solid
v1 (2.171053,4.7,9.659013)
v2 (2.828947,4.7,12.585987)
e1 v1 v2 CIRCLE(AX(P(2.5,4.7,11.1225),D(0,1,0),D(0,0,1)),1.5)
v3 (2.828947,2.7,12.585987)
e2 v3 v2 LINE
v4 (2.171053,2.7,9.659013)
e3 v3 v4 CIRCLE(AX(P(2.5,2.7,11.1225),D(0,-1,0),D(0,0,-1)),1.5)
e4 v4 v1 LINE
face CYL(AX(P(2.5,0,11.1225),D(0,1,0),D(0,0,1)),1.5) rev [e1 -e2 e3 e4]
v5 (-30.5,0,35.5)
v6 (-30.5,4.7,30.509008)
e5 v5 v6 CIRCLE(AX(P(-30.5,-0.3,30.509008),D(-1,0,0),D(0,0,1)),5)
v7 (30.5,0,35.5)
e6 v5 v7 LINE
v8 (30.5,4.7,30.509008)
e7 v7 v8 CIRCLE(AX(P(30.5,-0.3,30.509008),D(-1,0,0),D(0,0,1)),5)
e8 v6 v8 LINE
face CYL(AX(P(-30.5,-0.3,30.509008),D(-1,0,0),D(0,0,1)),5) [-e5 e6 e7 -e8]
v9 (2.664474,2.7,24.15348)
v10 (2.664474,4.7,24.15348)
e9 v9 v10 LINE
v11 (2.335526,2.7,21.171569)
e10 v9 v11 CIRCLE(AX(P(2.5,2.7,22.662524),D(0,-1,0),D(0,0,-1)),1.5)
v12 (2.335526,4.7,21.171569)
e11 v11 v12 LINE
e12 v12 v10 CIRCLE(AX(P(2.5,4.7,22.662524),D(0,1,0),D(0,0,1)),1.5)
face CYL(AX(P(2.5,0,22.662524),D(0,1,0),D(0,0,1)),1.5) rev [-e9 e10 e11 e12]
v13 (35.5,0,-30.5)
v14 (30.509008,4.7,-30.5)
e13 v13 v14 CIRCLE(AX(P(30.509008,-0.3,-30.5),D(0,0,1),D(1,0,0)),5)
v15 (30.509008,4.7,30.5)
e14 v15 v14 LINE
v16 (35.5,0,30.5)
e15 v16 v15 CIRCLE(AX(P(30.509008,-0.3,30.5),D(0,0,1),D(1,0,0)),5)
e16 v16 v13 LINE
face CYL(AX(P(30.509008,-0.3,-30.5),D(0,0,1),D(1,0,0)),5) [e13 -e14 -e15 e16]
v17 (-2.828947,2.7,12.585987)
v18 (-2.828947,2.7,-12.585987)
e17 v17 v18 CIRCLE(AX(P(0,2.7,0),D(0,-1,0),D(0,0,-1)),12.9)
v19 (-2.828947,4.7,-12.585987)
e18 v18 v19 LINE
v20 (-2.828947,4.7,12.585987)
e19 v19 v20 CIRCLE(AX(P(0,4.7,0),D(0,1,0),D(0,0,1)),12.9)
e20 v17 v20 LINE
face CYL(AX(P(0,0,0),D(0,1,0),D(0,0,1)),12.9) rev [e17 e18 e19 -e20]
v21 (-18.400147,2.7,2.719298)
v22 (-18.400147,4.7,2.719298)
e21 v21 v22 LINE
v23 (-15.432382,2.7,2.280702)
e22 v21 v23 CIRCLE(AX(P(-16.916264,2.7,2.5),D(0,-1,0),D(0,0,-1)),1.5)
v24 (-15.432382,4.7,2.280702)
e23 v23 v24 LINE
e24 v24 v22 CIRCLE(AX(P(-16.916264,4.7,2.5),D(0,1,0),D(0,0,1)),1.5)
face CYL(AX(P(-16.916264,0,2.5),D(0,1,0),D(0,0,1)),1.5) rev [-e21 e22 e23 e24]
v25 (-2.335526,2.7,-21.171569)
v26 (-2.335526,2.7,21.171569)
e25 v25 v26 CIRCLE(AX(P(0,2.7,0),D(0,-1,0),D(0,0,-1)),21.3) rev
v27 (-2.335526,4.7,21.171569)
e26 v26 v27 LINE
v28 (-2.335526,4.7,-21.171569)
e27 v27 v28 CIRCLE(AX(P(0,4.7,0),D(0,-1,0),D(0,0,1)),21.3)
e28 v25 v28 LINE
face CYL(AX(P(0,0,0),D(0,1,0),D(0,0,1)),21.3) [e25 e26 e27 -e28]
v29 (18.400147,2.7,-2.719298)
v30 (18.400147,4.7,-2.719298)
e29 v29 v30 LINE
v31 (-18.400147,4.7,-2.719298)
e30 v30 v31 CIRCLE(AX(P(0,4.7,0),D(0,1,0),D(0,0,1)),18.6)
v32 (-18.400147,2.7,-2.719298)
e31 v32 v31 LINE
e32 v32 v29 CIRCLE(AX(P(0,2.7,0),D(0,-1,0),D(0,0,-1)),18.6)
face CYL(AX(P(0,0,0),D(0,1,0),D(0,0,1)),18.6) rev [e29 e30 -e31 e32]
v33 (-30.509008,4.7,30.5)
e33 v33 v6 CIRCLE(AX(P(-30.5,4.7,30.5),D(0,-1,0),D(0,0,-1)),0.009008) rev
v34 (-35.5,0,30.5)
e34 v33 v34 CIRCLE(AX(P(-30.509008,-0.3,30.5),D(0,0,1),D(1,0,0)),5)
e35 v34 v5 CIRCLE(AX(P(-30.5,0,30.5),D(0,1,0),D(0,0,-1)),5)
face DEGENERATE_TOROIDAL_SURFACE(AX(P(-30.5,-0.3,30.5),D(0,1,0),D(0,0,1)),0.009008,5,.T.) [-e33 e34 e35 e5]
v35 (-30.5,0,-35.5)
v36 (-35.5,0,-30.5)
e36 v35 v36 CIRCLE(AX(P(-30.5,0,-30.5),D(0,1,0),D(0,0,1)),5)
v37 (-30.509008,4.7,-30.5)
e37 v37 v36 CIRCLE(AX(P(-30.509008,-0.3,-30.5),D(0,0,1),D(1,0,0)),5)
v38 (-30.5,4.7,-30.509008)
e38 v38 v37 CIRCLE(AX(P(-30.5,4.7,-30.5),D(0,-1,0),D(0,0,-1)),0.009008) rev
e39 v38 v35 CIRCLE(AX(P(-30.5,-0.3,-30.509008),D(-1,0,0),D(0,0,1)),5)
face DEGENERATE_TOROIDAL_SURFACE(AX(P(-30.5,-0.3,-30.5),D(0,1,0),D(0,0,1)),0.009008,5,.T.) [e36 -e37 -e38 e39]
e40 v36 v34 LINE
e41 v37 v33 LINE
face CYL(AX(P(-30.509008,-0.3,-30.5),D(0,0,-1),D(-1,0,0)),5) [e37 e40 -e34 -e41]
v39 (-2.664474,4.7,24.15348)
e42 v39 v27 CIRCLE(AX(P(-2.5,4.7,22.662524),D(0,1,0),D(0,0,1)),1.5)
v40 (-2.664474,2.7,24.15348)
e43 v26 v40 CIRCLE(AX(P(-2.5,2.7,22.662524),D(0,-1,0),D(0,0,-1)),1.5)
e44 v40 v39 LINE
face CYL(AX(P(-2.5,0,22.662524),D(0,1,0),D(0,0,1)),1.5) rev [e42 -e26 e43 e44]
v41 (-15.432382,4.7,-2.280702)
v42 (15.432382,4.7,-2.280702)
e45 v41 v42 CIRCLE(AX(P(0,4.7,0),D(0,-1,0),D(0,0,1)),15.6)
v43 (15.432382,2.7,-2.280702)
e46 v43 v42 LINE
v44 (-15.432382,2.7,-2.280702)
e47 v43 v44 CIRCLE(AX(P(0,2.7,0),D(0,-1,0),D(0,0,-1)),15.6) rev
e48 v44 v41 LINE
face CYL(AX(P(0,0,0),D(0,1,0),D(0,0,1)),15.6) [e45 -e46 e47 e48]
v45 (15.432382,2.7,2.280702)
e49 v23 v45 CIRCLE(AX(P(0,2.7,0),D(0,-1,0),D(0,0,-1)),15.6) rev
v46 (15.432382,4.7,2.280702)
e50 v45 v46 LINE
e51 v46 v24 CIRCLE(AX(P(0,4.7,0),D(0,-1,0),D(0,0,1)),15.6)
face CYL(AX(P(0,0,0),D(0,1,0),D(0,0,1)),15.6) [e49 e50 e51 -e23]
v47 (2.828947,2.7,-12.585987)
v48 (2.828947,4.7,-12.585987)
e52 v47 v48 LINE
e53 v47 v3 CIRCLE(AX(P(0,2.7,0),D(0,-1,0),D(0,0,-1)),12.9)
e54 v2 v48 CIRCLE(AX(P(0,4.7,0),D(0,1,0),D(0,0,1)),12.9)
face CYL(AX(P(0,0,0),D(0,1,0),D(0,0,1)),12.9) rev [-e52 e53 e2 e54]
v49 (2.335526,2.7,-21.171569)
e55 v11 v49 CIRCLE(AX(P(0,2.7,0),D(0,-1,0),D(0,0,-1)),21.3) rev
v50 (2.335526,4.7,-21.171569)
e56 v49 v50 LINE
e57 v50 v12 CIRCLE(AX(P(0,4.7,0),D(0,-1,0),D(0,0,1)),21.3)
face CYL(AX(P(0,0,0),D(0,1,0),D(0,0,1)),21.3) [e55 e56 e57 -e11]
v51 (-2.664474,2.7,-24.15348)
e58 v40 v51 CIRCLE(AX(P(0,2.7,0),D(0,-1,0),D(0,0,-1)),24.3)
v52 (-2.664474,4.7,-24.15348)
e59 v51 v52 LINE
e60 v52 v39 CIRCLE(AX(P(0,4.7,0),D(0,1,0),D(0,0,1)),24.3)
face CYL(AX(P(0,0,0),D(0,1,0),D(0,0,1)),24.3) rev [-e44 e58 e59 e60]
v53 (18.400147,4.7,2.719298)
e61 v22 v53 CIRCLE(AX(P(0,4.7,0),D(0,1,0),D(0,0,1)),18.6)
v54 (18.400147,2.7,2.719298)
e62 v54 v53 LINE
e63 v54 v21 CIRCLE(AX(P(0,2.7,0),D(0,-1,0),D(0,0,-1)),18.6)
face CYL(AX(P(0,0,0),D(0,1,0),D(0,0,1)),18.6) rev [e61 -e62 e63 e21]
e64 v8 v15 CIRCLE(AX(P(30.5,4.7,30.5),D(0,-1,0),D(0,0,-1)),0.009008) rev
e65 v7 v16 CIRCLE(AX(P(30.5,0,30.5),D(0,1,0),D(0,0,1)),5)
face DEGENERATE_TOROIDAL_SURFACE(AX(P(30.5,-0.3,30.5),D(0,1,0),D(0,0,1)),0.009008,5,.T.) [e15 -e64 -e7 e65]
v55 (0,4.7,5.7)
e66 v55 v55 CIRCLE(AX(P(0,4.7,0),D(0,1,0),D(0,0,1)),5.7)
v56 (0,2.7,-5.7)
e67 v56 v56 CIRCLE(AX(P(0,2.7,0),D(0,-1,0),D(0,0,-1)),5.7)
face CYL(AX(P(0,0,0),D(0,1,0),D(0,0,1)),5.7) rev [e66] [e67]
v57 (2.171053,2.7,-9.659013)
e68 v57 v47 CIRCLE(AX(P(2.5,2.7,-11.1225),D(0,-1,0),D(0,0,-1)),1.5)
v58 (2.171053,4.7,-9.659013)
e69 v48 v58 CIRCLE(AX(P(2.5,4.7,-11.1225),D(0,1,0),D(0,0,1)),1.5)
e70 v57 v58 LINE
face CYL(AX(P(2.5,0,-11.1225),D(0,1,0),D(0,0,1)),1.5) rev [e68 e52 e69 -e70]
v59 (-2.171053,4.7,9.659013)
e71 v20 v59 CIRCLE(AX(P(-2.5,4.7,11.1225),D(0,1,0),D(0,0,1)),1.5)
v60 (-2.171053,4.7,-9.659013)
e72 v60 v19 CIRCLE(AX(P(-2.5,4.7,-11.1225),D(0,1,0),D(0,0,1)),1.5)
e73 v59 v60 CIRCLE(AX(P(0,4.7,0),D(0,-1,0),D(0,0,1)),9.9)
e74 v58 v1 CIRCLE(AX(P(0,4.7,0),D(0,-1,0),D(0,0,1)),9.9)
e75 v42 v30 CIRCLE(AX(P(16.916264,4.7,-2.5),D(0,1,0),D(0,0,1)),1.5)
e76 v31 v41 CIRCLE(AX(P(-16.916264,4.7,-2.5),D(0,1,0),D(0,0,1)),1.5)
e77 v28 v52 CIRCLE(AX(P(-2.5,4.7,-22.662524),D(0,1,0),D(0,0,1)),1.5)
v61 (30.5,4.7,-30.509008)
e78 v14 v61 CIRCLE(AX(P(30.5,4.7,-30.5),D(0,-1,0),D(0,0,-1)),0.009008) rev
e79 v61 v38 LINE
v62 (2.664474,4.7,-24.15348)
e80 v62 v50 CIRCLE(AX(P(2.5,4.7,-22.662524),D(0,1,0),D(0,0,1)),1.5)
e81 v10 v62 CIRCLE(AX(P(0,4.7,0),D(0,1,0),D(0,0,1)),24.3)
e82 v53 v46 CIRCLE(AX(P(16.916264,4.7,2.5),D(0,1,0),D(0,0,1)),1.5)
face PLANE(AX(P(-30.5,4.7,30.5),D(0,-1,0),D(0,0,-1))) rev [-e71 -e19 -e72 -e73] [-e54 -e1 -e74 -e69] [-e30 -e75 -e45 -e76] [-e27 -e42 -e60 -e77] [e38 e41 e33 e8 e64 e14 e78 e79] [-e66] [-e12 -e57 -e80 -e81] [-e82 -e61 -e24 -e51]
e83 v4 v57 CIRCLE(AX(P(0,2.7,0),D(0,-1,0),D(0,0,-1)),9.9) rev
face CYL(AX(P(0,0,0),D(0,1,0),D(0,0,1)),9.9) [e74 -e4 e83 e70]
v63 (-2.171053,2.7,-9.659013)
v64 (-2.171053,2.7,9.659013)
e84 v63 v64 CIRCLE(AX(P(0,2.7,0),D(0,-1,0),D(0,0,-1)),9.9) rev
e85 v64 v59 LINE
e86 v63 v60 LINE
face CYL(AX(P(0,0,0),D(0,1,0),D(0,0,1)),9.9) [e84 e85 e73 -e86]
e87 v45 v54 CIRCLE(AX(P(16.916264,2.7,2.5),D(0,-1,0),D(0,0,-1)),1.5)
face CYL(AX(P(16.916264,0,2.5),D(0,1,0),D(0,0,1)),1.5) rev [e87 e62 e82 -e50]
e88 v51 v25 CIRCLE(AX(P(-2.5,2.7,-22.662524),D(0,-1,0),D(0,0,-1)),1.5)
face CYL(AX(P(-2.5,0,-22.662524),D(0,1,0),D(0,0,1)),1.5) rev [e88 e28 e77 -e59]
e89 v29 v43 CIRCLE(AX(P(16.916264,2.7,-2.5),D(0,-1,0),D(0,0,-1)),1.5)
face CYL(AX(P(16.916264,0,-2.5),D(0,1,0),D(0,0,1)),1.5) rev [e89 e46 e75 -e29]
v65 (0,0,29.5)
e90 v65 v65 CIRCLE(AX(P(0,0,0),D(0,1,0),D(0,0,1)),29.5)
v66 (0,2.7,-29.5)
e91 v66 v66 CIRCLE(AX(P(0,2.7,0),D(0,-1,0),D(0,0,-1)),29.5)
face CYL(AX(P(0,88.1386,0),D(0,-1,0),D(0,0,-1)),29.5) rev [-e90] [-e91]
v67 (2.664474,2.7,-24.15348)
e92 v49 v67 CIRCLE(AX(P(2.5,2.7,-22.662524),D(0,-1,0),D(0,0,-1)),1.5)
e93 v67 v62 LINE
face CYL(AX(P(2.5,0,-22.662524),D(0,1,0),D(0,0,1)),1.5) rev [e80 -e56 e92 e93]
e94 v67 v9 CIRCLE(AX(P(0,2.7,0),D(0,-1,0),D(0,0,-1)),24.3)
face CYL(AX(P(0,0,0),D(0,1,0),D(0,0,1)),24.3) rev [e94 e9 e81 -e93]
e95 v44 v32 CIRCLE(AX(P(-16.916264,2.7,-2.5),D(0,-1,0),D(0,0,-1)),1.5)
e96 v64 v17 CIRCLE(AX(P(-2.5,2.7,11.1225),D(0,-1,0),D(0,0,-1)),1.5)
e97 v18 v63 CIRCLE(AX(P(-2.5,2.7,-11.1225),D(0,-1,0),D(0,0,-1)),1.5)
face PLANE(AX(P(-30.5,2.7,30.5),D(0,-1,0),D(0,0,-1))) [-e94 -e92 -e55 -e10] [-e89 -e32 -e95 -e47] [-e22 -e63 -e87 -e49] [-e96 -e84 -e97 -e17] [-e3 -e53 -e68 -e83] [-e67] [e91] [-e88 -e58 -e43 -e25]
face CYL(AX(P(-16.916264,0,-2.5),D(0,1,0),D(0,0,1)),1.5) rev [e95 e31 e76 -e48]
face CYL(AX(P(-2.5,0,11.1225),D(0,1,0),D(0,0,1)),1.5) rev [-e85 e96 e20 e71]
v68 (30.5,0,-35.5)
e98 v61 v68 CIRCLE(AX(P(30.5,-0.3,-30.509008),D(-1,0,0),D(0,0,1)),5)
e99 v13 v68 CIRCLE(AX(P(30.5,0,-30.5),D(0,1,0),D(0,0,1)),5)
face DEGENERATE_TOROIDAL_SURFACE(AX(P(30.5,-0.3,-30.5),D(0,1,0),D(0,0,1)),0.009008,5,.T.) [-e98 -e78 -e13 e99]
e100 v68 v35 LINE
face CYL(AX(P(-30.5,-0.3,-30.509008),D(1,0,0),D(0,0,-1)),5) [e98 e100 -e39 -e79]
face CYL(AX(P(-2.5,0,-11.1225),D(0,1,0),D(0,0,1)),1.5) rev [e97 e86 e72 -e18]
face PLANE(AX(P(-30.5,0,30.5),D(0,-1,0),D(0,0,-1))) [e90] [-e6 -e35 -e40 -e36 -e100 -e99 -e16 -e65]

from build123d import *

# Parameters (mm, degrees)
EXTRUDE_1_DEPTH     = 4.7
FILLET_1_R          = 5
SKETCH_2_R          = 29.5
CUT_EXTRUDE_1_DEPTH = 2.7
SKETCH_3_R          = 5.7
CUT_EXTRUDE_2_DEPTH = 51.42410138


with BuildPart() as part:
    # Эскиз1 → Бобышка-Вытянуть1 (new body)
    with BuildSketch(Plane(origin=(0, 0, 0), x_dir=(1, 0, 0), z_dir=(0, 1, 0))):
        with BuildLine():
            Line((-30.5, 35.5), (30.5, 35.5))
            ThreePointArc((30.5, 35.5), (34.035533906, 34.035533906), (35.5, 30.5))
            Line((35.5, 30.5), (35.5, -30.5))
            ThreePointArc((35.5, -30.5), (34.035533906, -34.035533906), (30.5, -35.5))
            Line((30.5, -35.5), (-30.5, -35.5))
            ThreePointArc((-30.5, -35.5), (-34.035533906, -34.035533906), (-35.5, -30.5))
            Line((-35.5, -30.5), (-35.5, 30.5))
            ThreePointArc((-35.5, 30.5), (-34.035533906, 34.035533906), (-30.5, 35.5))
        make_face()
    extrude(amount=EXTRUDE_1_DEPTH)

    # Скругление1
    # the kernel refuses this fillet: 5 mm, written as the material it takes off along each edge
    with BuildSketch(Plane(origin=(-30.5, 4.7, 30.5), x_dir=(0, 0, 1), z_dir=(1, 0, 0))) as fillet_1_piece_1:
        with BuildLine():
            CenterArc((0.009008115, 5), FILLET_1_R, 270, 86.560187232)
            Line((0.009008115, 0), (0.009008115, -0.1))
            Line((0.009008115, -0.1), (5, -0.1))
            Line((5, -0.1), (5.1, 0))
            ThreePointArc((5.1, 0), (5.1, 2.35), (5.099819838, 4.694))
            Line((5.099819838, 4.694), (5, 4.7))
        make_face()
    revolve(axis=Axis((-30.5, 4.7, 30.5), (0, -1, 0)), revolution_arc=90, mode=Mode.SUBTRACT)
    with BuildSketch(Plane(origin=(-35.5, 4.7, 30.5), x_dir=(0, -1, 0), z_dir=(0, 0, -1)), Plane(origin=(-30.5, 4.7, -35.5), x_dir=(0, -1, 0), z_dir=(1, 0, 0)), Plane(origin=(35.5, 4.7, -30.5), x_dir=(0, -1, 0), z_dir=(0, 0, 1)), Plane(origin=(30.5, 4.7, 35.5), x_dir=(0, -1, 0), z_dir=(-1, 0, 0))) as fillet_1_piece_2:
        with BuildLine():
            CenterArc((5, -4.990991885), FILLET_1_R, 93.439812768, 86.560187232)
            Line((0, -4.990991885), (-0.1, -4.990991885))
            Line((-0.1, -4.990991885), (-0.1, 0))
            Line((-0.1, 0), (0, 0.1))
            ThreePointArc((0, 0.1), (2.35, 0.1), (4.694, 0.099819838))
            Line((4.694, 0.099819838), (4.7, 0))
        make_face()
    extrude(amount=61, mode=Mode.SUBTRACT)
    with BuildSketch(Plane(origin=(-30.5, 4.7, -30.5), x_dir=(-1, 0, 0), z_dir=(0, 0, 1))) as fillet_1_piece_3:
        with BuildLine():
            CenterArc((0.009008115, 5), FILLET_1_R, 270, 86.560187232)
            Line((0.009008115, 0), (0.009008115, -0.1))
            Line((0.009008115, -0.1), (5, -0.1))
            Line((5, -0.1), (5.1, 0))
            ThreePointArc((5.1, 0), (5.1, 2.35), (5.099819838, 4.694))
            Line((5.099819838, 4.694), (5, 4.7))
        make_face()
    revolve(axis=Axis((-30.5, 4.7, -30.5), (0, -1, 0)), revolution_arc=90, mode=Mode.SUBTRACT)
    with BuildSketch(Plane(origin=(30.5, 4.7, -30.5), x_dir=(0, 0, -1), z_dir=(-1, 0, 0))) as fillet_1_piece_4:
        with BuildLine():
            CenterArc((0.009008115, 5), FILLET_1_R, 270, 86.560187232)
            Line((0.009008115, 0), (0.009008115, -0.1))
            Line((0.009008115, -0.1), (5, -0.1))
            Line((5, -0.1), (5.1, 0))
            ThreePointArc((5.1, 0), (5.1, 2.35), (5.099819838, 4.694))
            Line((5.099819838, 4.694), (5, 4.7))
        make_face()
    revolve(axis=Axis((30.5, 4.7, -30.5), (0, -1, 0)), revolution_arc=90, mode=Mode.SUBTRACT)
    with BuildSketch(Plane(origin=(30.5, 4.7, 30.5), x_dir=(1, 0, 0), z_dir=(0, 0, -1))) as fillet_1_piece_5:
        with BuildLine():
            CenterArc((0.009008115, 5), FILLET_1_R, 270, 86.560187232)
            Line((0.009008115, 0), (0.009008115, -0.1))
            Line((0.009008115, -0.1), (5, -0.1))
            Line((5, -0.1), (5.1, 0))
            ThreePointArc((5.1, 0), (5.1, 2.35), (5.099819838, 4.694))
            Line((5.099819838, 4.694), (5, 4.7))
        make_face()
    revolve(axis=Axis((30.5, 4.7, 30.5), (0, -1, 0)), revolution_arc=90, mode=Mode.SUBTRACT)

    # Эскиз2 → Вырез-Вытянуть1 (cut)
    with BuildSketch(Plane(origin=(0, 0, 0), x_dir=(1, 0, 0), z_dir=(0, 1, 0))):
        with Locations(Location((0, 0, 0), (0, 0, 90))):
            Circle(SKETCH_2_R)
    extrude(amount=CUT_EXTRUDE_1_DEPTH, mode=Mode.SUBTRACT)

    # Эскиз3 → Вырез-Вытянуть2 (cut, through all)
    with BuildSketch(Plane(origin=(0, 4.7, 0), x_dir=(1, 0, 0), z_dir=(0, 1, 0))):
        with Locations(Location((0, 0, 0), (0, 0, 270))):
            Circle(SKETCH_3_R)
        with BuildLine():
            ThreePointArc((2.828947368, -12.585986524), (12.9, 0), (2.828947368, 12.585986524))
            ThreePointArc((2.828947368, 12.585986524), (1.036513195, 11.451447087), (2.171052632, 9.659012914))
            ThreePointArc((2.171052632, 9.659012914), (9.9, 0), (2.171052632, -9.659012914))
            ThreePointArc((2.171052632, -9.659012914), (1.036513195, -11.451447087), (2.828947368, -12.585986524))
        make_face()
        with BuildLine():
            ThreePointArc((-2.828947368, 12.585986524), (-12.9, 0), (-2.828947368, -12.585986524))
            ThreePointArc((-2.828947368, -12.585986524), (-1.036513195, -11.451447087), (-2.171052632, -9.659012914))
            ThreePointArc((-2.171052632, -9.659012914), (-9.9, 0), (-2.171052632, 9.659012914))
            ThreePointArc((-2.171052632, 9.659012914), (-1.036513195, 11.451447087), (-2.828947368, 12.585986524))
        make_face()
        with BuildLine():
            ThreePointArc((18.400147202, 2.719298246), (0, 18.6), (-18.400147202, 2.719298246))
            ThreePointArc((-18.400147202, 2.719298246), (-17.135562609, 1.016117161), (-15.432381524, 2.280701754))
            ThreePointArc((-15.432381524, 2.280701754), (0, 15.6), (15.432381524, 2.280701754))
            ThreePointArc((15.432381524, 2.280701754), (17.135562609, 1.016117161), (18.400147202, 2.719298246))
        make_face()
        with BuildLine():
            ThreePointArc((-18.400147202, -2.719298246), (0, -18.6), (18.400147202, -2.719298246))
            ThreePointArc((18.400147202, -2.719298246), (17.135562609, -1.016117161), (15.432381524, -2.280701754))
            ThreePointArc((15.432381524, -2.280701754), (0, -15.6), (-15.432381524, -2.280701754))
            ThreePointArc((-15.432381524, -2.280701754), (-17.135562609, -1.016117161), (-18.400147202, -2.719298246))
        make_face()
        with BuildLine():
            ThreePointArc((-2.664473684, 24.153479666), (-24.3, 0), (-2.664473684, -24.153479666))
            ThreePointArc((-2.664473684, -24.153479666), (-1.009044465, -22.826997815), (-2.335526316, -21.171568596))
            ThreePointArc((-2.335526316, -21.171568596), (-21.3, 0), (-2.335526316, 21.171568596))
            ThreePointArc((-2.335526316, 21.171568596), (-1.009044465, 22.826997815), (-2.664473684, 24.153479666))
        make_face()
        with BuildLine():
            ThreePointArc((2.664473684, -24.153479666), (24.3, 0), (2.664473684, 24.153479666))
            ThreePointArc((2.664473684, 24.153479666), (1.009044465, 22.826997815), (2.335526316, 21.171568596))
            ThreePointArc((2.335526316, 21.171568596), (21.3, 0), (2.335526316, -21.171568596))
            ThreePointArc((2.335526316, -21.171568596), (1.009044465, -22.826997815), (2.664473684, -24.153479666))
        make_face()
    extrude(amount=-CUT_EXTRUDE_2_DEPTH, mode=Mode.SUBTRACT)


solid = part.part
